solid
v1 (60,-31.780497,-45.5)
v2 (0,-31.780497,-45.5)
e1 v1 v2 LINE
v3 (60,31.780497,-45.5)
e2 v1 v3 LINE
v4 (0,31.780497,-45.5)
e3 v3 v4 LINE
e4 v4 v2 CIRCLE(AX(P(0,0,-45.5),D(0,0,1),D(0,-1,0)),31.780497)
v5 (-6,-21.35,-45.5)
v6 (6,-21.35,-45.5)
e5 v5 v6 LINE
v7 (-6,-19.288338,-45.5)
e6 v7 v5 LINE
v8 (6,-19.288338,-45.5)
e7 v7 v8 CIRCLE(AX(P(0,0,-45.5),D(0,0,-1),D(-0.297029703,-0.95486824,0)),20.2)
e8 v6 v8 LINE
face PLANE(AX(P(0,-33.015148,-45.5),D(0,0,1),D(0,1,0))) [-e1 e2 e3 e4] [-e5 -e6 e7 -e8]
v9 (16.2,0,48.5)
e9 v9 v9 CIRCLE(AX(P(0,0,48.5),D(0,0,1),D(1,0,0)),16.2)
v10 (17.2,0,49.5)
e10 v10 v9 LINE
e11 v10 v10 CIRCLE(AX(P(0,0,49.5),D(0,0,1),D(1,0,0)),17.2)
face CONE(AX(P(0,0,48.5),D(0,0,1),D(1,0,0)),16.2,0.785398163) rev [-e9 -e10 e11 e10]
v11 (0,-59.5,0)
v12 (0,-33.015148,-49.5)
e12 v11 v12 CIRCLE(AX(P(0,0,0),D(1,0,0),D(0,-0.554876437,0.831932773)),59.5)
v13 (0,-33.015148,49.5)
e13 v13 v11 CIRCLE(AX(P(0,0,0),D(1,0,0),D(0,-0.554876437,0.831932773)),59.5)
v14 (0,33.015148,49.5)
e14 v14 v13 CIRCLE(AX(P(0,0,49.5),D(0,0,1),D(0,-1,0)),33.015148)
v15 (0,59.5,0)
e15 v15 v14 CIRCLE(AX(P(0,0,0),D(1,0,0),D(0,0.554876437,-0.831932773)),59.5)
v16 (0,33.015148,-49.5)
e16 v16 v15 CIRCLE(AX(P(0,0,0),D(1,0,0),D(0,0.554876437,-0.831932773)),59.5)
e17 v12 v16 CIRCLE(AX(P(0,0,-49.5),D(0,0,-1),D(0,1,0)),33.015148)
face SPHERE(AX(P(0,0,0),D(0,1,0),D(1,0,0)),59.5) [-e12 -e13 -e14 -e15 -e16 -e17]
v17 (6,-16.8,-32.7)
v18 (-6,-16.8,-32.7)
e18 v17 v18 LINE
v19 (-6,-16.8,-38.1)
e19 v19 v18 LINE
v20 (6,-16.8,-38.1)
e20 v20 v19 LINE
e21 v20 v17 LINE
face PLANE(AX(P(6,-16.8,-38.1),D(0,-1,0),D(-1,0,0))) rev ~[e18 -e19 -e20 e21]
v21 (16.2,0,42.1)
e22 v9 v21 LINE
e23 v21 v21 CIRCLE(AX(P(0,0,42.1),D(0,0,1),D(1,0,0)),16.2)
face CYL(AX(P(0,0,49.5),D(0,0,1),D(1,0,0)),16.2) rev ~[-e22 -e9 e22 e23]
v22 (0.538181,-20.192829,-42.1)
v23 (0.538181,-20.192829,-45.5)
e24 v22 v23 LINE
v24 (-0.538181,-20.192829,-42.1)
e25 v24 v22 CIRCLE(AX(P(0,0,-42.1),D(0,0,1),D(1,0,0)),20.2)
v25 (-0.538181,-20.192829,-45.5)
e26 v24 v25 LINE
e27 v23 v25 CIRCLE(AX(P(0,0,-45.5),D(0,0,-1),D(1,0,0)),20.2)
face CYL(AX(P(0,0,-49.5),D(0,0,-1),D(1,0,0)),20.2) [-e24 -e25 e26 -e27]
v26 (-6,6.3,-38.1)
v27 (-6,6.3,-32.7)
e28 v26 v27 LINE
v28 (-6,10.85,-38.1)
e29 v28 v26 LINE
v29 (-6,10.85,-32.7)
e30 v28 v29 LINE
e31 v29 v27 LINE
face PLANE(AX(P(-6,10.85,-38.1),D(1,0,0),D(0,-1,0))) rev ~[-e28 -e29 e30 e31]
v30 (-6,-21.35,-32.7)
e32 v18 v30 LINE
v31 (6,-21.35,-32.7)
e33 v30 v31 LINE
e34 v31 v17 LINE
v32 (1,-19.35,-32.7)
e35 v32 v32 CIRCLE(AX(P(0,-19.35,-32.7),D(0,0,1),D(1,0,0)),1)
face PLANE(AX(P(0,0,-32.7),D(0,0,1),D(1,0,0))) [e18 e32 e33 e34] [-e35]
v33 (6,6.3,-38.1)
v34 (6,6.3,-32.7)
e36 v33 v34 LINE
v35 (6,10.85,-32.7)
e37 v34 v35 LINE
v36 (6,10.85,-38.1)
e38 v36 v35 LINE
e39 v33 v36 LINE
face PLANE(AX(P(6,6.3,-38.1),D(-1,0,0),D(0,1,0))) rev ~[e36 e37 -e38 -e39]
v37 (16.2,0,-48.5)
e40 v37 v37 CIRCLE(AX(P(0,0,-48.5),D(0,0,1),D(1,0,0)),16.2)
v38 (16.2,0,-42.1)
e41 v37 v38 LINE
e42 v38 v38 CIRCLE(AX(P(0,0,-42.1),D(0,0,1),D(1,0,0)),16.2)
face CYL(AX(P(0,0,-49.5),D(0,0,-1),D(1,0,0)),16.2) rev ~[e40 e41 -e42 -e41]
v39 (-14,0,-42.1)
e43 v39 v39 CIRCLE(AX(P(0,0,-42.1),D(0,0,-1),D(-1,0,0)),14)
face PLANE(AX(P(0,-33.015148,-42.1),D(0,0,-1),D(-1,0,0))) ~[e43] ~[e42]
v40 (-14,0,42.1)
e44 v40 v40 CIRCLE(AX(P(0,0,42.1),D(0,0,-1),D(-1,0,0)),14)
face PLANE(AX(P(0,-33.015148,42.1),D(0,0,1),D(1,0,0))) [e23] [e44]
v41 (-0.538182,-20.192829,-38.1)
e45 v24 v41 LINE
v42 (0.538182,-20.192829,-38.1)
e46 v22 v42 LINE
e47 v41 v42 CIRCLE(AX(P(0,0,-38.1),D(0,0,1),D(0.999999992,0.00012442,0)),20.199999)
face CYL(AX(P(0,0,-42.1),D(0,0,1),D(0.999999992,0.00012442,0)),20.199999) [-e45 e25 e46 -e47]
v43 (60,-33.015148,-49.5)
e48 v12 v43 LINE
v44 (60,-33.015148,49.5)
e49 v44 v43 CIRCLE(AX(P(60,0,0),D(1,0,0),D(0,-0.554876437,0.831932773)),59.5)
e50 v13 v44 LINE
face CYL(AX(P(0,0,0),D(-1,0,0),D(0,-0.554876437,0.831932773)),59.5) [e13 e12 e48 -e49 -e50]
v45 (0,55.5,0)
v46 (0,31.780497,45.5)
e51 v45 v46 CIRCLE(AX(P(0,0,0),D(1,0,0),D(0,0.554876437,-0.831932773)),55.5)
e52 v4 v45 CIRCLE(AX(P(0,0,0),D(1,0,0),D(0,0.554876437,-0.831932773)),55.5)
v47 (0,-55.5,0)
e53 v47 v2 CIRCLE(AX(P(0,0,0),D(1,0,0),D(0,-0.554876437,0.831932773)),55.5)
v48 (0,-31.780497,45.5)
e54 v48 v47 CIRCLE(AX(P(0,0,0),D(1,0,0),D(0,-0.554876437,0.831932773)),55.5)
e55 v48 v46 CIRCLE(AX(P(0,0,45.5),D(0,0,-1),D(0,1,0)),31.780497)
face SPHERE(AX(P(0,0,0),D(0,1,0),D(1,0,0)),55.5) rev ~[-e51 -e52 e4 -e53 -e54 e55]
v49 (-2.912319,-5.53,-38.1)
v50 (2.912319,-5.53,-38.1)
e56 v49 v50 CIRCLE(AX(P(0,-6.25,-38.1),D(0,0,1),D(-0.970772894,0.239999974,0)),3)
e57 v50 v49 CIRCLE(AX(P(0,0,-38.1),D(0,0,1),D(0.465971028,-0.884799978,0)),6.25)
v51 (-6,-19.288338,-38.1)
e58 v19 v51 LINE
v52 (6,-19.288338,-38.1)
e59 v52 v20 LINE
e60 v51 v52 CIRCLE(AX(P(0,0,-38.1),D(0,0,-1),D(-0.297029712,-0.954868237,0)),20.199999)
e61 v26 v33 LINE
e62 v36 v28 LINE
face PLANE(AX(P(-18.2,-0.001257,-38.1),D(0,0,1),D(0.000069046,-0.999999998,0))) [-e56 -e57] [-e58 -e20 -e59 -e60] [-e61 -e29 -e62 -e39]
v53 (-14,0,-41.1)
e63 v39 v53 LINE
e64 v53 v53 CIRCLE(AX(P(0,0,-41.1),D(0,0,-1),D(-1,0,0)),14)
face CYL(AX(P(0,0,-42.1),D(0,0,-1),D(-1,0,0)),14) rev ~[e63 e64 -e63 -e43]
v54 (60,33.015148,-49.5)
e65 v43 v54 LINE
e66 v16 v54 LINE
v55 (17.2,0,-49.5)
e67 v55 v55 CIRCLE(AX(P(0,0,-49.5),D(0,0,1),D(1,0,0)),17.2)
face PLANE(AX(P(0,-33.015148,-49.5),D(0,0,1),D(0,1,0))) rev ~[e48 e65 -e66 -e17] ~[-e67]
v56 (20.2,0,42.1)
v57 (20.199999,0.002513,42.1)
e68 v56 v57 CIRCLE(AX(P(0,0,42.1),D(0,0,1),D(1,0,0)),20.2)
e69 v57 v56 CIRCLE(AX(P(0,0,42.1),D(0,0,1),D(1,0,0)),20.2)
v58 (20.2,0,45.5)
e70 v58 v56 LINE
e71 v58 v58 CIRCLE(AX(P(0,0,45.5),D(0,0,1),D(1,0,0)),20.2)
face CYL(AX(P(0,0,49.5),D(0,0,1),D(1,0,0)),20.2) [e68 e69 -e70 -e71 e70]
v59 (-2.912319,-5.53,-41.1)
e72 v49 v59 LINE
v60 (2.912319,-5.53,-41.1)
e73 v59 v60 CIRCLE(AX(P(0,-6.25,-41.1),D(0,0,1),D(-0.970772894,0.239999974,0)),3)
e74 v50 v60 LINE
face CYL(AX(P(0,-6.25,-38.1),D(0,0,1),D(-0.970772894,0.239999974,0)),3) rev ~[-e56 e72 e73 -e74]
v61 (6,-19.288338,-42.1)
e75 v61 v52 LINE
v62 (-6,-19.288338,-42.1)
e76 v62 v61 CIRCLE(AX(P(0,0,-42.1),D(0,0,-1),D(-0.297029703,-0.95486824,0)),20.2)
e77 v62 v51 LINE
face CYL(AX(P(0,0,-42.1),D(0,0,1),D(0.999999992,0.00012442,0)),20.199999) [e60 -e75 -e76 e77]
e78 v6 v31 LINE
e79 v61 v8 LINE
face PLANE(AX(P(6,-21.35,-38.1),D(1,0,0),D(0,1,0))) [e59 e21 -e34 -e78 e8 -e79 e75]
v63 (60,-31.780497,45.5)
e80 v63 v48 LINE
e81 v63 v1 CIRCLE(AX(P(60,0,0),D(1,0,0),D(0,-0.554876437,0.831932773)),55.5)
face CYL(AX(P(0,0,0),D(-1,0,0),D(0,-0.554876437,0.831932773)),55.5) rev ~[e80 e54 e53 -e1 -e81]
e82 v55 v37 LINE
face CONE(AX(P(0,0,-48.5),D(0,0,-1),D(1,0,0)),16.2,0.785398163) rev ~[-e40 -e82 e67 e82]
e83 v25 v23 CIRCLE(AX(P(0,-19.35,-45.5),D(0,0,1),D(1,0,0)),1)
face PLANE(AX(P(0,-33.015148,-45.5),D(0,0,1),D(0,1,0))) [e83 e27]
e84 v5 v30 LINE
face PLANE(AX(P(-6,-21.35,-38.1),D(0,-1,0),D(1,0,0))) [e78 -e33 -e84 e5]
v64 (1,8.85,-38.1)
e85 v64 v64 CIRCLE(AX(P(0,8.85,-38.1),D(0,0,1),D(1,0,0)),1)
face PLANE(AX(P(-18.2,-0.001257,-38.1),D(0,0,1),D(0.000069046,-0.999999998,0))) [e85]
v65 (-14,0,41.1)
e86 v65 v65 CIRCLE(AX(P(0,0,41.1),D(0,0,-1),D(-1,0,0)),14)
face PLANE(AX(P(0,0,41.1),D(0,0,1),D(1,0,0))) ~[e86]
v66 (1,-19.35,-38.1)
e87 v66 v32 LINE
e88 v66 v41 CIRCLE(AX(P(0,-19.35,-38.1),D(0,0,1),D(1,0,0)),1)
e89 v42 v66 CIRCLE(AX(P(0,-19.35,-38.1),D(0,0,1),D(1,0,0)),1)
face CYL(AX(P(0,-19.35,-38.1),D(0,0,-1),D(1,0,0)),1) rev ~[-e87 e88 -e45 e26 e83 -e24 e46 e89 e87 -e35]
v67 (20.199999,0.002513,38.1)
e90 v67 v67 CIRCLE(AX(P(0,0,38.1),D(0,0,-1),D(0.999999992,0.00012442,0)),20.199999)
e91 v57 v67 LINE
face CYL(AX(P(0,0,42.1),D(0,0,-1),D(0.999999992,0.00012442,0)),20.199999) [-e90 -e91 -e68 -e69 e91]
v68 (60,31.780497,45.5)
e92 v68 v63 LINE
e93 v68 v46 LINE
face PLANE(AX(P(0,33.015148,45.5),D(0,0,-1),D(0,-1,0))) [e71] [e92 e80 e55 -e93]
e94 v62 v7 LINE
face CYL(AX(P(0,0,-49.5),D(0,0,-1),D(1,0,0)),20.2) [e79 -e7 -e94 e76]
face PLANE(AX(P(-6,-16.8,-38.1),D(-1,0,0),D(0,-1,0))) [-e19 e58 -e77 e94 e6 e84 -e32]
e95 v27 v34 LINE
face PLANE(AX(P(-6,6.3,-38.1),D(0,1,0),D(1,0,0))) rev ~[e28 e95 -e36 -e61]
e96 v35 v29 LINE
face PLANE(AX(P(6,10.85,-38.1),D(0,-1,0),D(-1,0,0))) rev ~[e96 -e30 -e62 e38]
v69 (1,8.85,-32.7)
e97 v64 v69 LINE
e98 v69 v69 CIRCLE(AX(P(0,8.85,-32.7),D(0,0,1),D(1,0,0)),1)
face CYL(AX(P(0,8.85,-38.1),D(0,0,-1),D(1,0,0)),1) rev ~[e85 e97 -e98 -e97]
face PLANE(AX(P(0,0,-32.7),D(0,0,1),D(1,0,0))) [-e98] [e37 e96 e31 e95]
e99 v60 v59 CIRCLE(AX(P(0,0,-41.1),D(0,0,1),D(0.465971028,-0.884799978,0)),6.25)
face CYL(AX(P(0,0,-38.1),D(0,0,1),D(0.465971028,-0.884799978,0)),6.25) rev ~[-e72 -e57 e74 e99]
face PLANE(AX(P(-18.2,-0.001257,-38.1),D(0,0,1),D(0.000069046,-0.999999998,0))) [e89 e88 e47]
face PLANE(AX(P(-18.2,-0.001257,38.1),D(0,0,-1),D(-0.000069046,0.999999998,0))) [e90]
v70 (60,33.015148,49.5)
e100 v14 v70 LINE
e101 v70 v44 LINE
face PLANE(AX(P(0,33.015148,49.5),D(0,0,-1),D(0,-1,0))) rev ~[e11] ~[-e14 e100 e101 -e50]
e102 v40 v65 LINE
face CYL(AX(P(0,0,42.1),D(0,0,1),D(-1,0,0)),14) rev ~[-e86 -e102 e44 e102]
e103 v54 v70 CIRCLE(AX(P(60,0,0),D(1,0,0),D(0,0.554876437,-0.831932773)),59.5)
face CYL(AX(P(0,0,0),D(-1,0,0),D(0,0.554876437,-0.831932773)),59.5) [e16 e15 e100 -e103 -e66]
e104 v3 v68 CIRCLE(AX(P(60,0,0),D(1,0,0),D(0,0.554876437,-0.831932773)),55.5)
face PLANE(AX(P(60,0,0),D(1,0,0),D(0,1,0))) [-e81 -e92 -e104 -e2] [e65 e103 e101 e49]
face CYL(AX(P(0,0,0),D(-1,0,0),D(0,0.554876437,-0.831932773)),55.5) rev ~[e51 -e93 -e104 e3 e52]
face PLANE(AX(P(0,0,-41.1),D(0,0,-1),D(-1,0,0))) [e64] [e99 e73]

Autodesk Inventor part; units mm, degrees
ref_plane "YZ Plane" through (0, 0, 0) normal (1, 0, 0) x (0, 1, 0)
ref_plane "XZ Plane" through (0, 0, 0) normal (0, 1, 0) x (-1, 0, 0)
ref_plane "XY Plane" through (0, 0, 0) normal (0, 0, 1) x (1, 0, 0)
sketch "스케치1" plane through (0, 0, 0) normal (0, 0, 1) x (1, 0, 0)
  circle A0 centre (0, 0) radius 59.5
  line L0 (0, 59.5) -> (0, -59.5)
  dimension "d0" = 119
sketch "스케치1 outline for 회전1" plane through (0, 0, 0) normal (0, 0, 1) x (1, 0, 0)
  line L0 (0, 59.5) -> (0, -59.5)
  arc A0 (0, -59.5) -> (0, 59.5) centre (0, 0) ccw
revolve "회전1" add sketch "스케치1 outline for 회전1" angle 360 about axis through (0, 59.5, 0) along (0, -1, 0)
sketch "스케치2" plane through (0, 0, 0) normal (1, 0, 0) x (0, 1, 0)
  line L0 (-88.471699, 49.5) -> (88.471699, 49.5)
  line L1 (88.471699, 49.5) -> (88.471699, -49.5)
  line L2 (88.471699, -49.5) -> (-88.471699, -49.5)
  line L3 (-88.471699, -49.5) -> (-88.471699, 49.5)
  line L4 (-88.471699, 49.5) -> (88.471699, -49.5) construction
  line L5 (88.471699, 49.5) -> (-88.471699, -49.5) construction
  line L6 (-88.471699, 113.085262) -> (88.471699, 113.085262)
  line L7 (88.471699, 113.085262) -> (88.471699, -113.085262)
  line L8 (88.471699, -113.085262) -> (-88.471699, -113.085262)
  line L9 (-88.471699, -113.085262) -> (-88.471699, 113.085262)
  line L10 (-88.471699, 113.085262) -> (88.471699, -113.085262) construction
  line L11 (88.471699, 113.085262) -> (-88.471699, -113.085262) construction
  point P0 (0, 0)
  dimension "d2" = 99
sketch "스케치2 outline for 돌출1" plane through (0, 0, 0) normal (1, 0, 0) x (0, 1, 0)
  line L0 (88.471699, 113.085262) -> (-88.471699, 113.085262)
  line L1 (88.471699, 49.5) -> (88.471699, 113.085262)
  line L2 (-88.471699, 49.5) -> (88.471699, 49.5)
  line L3 (-88.471699, 113.085262) -> (-88.471699, 49.5)
  line L4 (-88.471699, -113.085262) -> (88.471699, -113.085262)
  line L5 (-88.471699, -49.5) -> (-88.471699, -113.085262)
  line L6 (88.471699, -49.5) -> (-88.471699, -49.5)
  line L7 (88.471699, -113.085262) -> (88.471699, -49.5)
extrude "돌출1" cut sketch "스케치2 outline for 돌출1" along normal mid plane 212.75
sketch "스케치3" plane through (0, 0, 0) normal (1, 0, 0) x (0, 1, 0)
  line L0 (-33.015148, 49.5) -> (33.015148, 49.5)
  line L1 (33.015148, -49.5) -> (-33.015148, -49.5)
  arc A0 (-33.015148, 49.5) -> (33.015148, 49.5) centre (0, 0) ccw
sketch "스케치3 outline for 돌출2" plane through (0, 0, 0) normal (1, 0, 0) x (0, 1, 0)
  line L0 (33.015148, 49.5) -> (-33.015148, 49.5)
  arc A0 (33.015148, -49.5) -> (33.015148, 49.5) centre (0, 0) ccw
  line L1 (-33.015148, -49.5) -> (33.015148, -49.5)
  arc A1 (-33.015148, 49.5) -> (-33.015148, -49.5) centre (0, 0) ccw
extrude "돌출2" add sketch "스케치3 outline for 돌출2" along normal blind 60
sketch "스케치5" plane through (0, -33.015148, 49.5) normal (0, 0, 1) x (1, 0, 0)
  circle A0 centre (0, 33.015148) radius 16.2
  dimension "d10" = 32.4
sketch "스케치5 outline for 돌출4" plane through (0, -33.015148, 49.5) normal (0, 0, 1) x (1, 0, 0)
  circle A0 centre (0, 33.015148) radius 16.2
extrude "돌출4" cut sketch "스케치5 outline for 돌출4" against normal blind 7.4
mirror "미러1" about plane through (0, 0, 0) normal (0, 0, 1) of "돌출4"
chamfer "모따기2" distance 1 angle 45 2 edges at (-16.2, 0, 49.5) (-16.2, 0, -49.5)
shell "쉘1" thickness 4 removed faces 1 at (60, 18.496646, 1.76927)
sketch "스케치7" plane through (0, 0, -42.1) normal (0, 0, -1) x (-1, 0, 0)
  circle A0 centre (0, 0) radius 3.85
  dimension "d20" = 7.7
sketch "스케치7 outline for 돌출5" plane through (0, 0, -42.1) normal (0, 0, -1) x (-1, 0, 0)
  circle A0 centre (0, 0) radius 3.85
extrude "돌출5" cut sketch "스케치7 outline for 돌출5" against normal blind 12
sketch "스케치8" plane through (0, 0, -38.1) normal (0, 0, 1) x (1, 0, 0)
  circle A0 centre (0, 0) radius 3.85 projected
  circle A1 centre (0, 0) radius 6.25
  circle A2 centre (0, -6.25) radius 3
  point P0 (2.912319, -5.53)
  point P1 (-2.912319, -5.53)
  dimension "d23" = 12.5
  dimension "d24" = 6
sketch "스케치8 outline for 돌출6" plane through (0, 0, -38.1) normal (0, 0, 1) x (1, 0, 0)
  arc A0 (2.912319, -5.53) -> (-2.912319, -5.53) centre (0, 0) ccw
  arc A1 (-2.912319, -5.53) -> (2.912319, -5.53) centre (0, -6.25) ccw
  circle A2 centre (0, 0) radius 3.85
extrude "돌출6" cut sketch "스케치8 outline for 돌출6" against normal blind 8.25
sketch "스케치10" plane through (0, 0, -38.1) normal (0, 0, 1) x (1, 0, 0)
  line L0 (0, 0) -> (0, -16.8) construction
  line L1 (0, 0) -> (0, 6.3) construction
  line L2 (-6, 6.3) -> (6, 6.3)
  line L3 (6, 6.3) -> (6, -16.8)
  line L4 (6, -16.8) -> (-6, -16.8)
  line L5 (-6, -16.8) -> (-6, 6.3)
  line L6 (-6, -5.25) -> (0, -5.25) construction
  line L7 (-6, -21.35) -> (6, -21.35)
  line L8 (6, -21.35) -> (6, 10.85)
  line L9 (6, 10.85) -> (-6, 10.85)
  line L10 (-6, 10.85) -> (-6, -21.35)
  line L11 (-6, -21.35) -> (6, 10.85) construction
  line L12 (6, -21.35) -> (-6, 10.85) construction
  line L13 (0, -5.25) -> (0, 8.85)
  circle A0 centre (0, 8.85) radius 1
  circle A1 centre (0, -19.35) radius 1
  arc A2 (-2.904738, -5.25) -> (2.904738, -5.25) centre (0, -6) ccw
  arc A3 (2.904738, -5.25) -> (-2.904738, -5.25) centre (0, 0) ccw
  circle A4 centre (0, 0) radius 3.85
  point P0 (-6, -16.8)
  point P1 (6, 6.3)
  point P2 (-6, 6.3)
  dimension "d28" = 6.3
  dimension "d29" = 12
  dimension "d30" = 32.2
  dimension "d31" = 14.1
  dimension "d32" = 2
sketch "스케치10 outline for 돌출7" plane through (0, 0, -38.1) normal (0, 0, 1) x (1, 0, 0)
  line L0 (-6, -21.35) -> (6, -21.35)
  line L1 (-6, -16.8) -> (-6, -21.35)
  line L2 (6, -21.35) -> (6, -16.8)
  line L3 (6, -16.8) -> (-6, -16.8)
  circle A0 centre (0, -19.35) radius 1
  line L4 (-6, 6.3) -> (6, 6.3)
  line L5 (-6, 10.85) -> (-6, 6.3)
  line L6 (6, 6.3) -> (6, 10.85)
  line L7 (6, 10.85) -> (-6, 10.85)
  circle A1 centre (0, 8.85) radius 1
extrude "돌출7" add sketch "스케치10 outline for 돌출7" along normal blind 5.4
sketch "스케치11" plane through (0, 0, -42.1) normal (0, 0, -1) x (-1, 0, 0)
  circle A0 centre (0, 0) radius 3.85 projected
  circle A1 centre (0, 0) radius 14
  dimension "d35" = 28
sketch "스케치11 outline for 돌출8" plane through (0, 0, -42.1) normal (0, 0, -1) x (-1, 0, 0)
  circle A0 centre (0, 0) radius 14
extrude "돌출8" cut sketch "스케치11 outline for 돌출8" against normal blind 1
mirror "미러2" about plane through (0, 0, 0) normal (0, 0, 1) of "돌출8"
sketch "스케치10 outline for 돌출9" plane through (0, 0, -38.1) normal (0, 0, 1) x (1, 0, 0)
  line L0 (-6, -21.35) -> (6, -21.35)
  line L1 (-6, -16.8) -> (-6, -21.35)
  line L2 (6, -21.35) -> (6, -16.8)
  line L3 (6, -16.8) -> (-6, -16.8)
  circle A0 centre (0, -19.35) radius 1
extrude "돌출9" add sketch "스케치10 outline for 돌출9" against normal up to surface (7.4 mm away)
properties part number "메인 상단 헤드"
